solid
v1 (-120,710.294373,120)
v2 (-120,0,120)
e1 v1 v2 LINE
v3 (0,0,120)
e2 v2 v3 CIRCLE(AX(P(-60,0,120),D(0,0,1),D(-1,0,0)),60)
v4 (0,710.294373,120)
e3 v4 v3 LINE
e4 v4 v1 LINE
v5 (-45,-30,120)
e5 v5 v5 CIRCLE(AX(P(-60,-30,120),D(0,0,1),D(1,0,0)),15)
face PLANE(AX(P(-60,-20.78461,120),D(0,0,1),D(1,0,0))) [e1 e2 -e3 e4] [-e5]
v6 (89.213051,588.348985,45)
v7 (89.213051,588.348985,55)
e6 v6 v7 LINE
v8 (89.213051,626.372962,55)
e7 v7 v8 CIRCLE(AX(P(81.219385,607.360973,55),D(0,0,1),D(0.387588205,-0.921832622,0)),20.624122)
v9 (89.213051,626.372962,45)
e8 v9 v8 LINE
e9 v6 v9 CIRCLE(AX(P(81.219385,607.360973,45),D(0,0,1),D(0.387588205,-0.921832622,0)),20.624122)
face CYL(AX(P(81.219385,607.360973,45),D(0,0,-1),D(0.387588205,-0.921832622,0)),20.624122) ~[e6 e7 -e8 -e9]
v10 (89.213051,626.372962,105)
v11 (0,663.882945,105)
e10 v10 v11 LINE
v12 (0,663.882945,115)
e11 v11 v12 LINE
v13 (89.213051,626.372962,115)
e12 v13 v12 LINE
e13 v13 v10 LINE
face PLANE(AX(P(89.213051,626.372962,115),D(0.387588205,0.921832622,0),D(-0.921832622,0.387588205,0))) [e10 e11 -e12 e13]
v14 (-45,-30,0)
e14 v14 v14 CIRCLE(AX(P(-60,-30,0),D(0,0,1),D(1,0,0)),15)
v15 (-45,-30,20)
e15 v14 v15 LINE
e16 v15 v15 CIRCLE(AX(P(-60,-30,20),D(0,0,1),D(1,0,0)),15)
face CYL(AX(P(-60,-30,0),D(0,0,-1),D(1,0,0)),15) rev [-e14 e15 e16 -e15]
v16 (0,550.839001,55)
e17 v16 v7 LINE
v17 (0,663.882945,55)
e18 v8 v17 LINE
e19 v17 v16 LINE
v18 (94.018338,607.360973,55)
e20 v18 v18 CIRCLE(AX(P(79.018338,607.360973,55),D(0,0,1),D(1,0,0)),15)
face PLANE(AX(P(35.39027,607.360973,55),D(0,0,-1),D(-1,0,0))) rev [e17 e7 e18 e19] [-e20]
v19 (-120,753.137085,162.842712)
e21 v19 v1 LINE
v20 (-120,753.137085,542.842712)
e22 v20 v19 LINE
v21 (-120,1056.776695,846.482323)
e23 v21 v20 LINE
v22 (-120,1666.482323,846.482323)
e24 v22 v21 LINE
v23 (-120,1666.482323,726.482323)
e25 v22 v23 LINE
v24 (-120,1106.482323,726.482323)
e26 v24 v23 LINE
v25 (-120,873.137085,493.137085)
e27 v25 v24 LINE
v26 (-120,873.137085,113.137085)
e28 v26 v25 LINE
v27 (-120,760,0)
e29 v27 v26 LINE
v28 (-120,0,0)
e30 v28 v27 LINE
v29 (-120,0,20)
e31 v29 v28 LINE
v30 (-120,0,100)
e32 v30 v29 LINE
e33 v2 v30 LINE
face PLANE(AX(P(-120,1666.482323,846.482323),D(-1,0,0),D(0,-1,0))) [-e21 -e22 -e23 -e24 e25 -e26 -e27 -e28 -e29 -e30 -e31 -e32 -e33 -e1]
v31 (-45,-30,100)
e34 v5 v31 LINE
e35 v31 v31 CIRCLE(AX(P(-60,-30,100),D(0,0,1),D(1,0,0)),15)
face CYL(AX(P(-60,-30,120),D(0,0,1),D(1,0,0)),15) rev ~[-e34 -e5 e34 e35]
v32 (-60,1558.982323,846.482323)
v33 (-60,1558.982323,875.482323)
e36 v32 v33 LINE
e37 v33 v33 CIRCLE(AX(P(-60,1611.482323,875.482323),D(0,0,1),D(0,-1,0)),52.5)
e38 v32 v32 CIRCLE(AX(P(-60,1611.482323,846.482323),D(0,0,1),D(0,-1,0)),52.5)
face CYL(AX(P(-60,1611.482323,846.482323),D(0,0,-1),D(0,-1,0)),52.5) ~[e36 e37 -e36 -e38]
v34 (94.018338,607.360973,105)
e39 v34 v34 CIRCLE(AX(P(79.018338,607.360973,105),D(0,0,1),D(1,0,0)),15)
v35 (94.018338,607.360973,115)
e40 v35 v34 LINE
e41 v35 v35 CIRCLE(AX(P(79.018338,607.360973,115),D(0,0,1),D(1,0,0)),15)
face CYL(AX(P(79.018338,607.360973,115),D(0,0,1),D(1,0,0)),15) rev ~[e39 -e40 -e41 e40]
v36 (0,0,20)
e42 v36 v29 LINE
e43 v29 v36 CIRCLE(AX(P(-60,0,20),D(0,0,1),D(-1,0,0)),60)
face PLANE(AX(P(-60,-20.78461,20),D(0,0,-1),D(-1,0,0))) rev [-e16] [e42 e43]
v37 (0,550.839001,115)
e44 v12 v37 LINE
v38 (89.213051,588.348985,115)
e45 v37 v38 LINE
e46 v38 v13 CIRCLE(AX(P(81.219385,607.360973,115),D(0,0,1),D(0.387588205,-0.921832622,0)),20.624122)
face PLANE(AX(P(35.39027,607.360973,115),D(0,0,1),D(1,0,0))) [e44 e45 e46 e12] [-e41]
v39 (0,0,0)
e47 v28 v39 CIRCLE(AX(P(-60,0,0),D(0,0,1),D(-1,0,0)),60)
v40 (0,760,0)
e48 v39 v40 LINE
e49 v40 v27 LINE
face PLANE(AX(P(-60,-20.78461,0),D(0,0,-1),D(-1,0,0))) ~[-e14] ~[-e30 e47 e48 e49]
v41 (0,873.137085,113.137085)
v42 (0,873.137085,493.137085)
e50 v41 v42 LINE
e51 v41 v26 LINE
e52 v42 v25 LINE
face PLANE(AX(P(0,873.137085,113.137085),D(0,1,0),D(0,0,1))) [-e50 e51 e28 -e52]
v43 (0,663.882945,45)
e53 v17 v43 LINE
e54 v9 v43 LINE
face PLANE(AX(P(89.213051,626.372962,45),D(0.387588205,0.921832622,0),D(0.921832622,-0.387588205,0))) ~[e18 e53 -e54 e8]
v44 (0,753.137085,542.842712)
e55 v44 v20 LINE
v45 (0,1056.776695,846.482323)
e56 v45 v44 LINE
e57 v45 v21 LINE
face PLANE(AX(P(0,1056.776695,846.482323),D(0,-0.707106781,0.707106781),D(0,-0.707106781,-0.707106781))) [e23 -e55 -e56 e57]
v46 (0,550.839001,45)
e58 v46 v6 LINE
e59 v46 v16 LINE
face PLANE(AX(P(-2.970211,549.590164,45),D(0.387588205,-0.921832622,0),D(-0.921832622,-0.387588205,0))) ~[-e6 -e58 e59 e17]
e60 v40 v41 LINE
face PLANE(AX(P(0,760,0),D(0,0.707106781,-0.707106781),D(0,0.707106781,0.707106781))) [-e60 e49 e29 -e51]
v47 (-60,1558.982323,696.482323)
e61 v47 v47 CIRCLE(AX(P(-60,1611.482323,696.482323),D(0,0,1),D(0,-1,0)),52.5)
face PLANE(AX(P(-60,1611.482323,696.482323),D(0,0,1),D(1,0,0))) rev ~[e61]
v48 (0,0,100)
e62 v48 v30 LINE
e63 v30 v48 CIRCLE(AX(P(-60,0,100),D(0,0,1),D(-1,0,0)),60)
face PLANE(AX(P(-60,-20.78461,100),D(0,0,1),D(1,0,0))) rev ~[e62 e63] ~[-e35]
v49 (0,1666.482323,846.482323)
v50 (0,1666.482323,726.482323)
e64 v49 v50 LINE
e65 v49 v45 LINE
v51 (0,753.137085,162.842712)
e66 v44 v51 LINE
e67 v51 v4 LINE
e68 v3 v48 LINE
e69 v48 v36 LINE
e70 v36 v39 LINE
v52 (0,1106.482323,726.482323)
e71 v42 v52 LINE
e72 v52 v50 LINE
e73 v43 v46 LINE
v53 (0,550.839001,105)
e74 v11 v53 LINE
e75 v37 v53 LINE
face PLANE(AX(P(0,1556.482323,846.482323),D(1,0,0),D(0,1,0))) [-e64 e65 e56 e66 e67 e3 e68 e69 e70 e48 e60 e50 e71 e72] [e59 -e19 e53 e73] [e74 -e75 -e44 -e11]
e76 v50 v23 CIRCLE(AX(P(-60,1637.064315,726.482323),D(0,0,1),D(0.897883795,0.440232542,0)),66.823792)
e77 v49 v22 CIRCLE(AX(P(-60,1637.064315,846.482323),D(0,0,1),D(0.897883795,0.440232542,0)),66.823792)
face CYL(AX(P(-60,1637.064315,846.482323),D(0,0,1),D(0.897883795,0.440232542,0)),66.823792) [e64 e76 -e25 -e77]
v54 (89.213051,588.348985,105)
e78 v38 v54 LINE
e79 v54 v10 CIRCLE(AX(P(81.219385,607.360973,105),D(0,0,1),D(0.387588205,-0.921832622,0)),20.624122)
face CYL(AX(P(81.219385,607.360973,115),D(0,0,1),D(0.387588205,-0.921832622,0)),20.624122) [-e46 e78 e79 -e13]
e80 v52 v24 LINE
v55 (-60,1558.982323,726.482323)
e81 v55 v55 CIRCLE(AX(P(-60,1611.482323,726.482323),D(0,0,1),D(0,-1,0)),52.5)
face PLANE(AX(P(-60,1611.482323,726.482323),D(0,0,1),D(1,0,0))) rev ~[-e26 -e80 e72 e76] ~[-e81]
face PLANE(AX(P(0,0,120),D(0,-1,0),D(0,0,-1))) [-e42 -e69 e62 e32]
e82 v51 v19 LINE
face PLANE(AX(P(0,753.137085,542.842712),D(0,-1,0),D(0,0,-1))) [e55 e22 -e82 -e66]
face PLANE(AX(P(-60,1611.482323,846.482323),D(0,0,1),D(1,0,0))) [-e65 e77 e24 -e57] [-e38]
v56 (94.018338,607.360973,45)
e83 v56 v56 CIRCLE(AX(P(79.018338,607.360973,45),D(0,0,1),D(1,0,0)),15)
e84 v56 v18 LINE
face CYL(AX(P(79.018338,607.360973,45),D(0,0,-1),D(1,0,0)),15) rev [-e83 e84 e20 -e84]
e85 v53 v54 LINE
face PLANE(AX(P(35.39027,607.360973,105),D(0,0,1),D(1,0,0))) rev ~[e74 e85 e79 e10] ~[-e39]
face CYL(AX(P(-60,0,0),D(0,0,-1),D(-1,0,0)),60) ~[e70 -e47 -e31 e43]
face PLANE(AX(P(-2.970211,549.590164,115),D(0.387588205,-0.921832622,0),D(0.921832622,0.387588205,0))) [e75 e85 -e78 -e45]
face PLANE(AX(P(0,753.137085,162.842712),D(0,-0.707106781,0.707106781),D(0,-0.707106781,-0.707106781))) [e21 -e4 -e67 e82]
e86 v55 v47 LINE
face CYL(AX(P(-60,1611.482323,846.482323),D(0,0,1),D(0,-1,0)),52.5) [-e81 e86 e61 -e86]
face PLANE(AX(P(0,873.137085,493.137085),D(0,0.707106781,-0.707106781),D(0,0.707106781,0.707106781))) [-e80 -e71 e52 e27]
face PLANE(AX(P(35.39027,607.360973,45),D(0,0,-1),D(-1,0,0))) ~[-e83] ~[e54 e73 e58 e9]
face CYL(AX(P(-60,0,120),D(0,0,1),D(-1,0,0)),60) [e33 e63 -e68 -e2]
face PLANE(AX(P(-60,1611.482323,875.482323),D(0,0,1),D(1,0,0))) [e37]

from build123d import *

# Parameters (mm, degrees)
F1_DEPTH  = 120
F2_R      = 15
F3_DEPTH  = 20
F6_DEPTH  = 120
F7_DEPTH  = 29
F8_DEPTH  = 150
F11_R     = 15
F12_DEPTH = 10


# Not quite as in the source:
# - a pattern or mirror of a feature is missing from the dataset's text; its kind, count and spacing are read off the source's solid


with BuildPart() as f1:
    # F0 (on Right) → F1 (new body)
    with BuildSketch(Plane.YZ):
        Polygon((0, 120), (0, 0), (700, 0), (760, 0), (873.1370849898, 113.1370849898), (873.1370849898, 493.1370849898), (1106.4823227814, 726.4823227814), (1556.4823227814, 726.4823227814), (1556.4823227814, 846.4823227814), (1056.7766952966, 846.4823227814), (753.1370849898, 542.8427124746), (753.1370849898, 162.8427124746), (710.2943725152, 120), (700, 120), align=None)
    extrude(amount=-F1_DEPTH)

    # F2 (on face) → F3 (join)
    with BuildSketch(Plane.XY.offset(120)):
        with BuildLine():
            Line((0, 0), (-120, 0))
            ThreePointArc((-120, 0), (-60, -60), (0, 0))
        make_face()
        with Locations((-60, -30)):
            Circle(F2_R, mode=Mode.SUBTRACT)
    f3 = extrude(amount=-F3_DEPTH)

    # F3_copies: F3 across plane
    add(f3.mirror(Plane(origin=(0, 0, 60), x_dir=(-1, 0, 0), z_dir=(0, 0, -1))))

    # F5 (on face) → F6 (join)
    with BuildSketch(Plane.XY.offset(846.4823227814)):
        Polygon((-120, 1556.4823227814), (-60, 1556.4823227814), (0, 1556.4823227814), (0, 1666.4823227814), (-120, 1666.4823227814), align=None)
        with BuildLine():
            ThreePointArc((-7.5, 1611.4823227814), (-22.8768939877, 1574.3592167691), (-60, 1558.9823227814))
            ThreePointArc((-60, 1558.9823227814), (-97.1231060123, 1648.6054287937), (-7.5, 1611.4823227814))
        make_face(mode=Mode.SUBTRACT)
        with BuildLine():
            ThreePointArc((-7.5, 1611.4823227814), (-97.1231060123, 1648.6054287937), (-60, 1558.9823227814))
            ThreePointArc((-60, 1558.9823227814), (-22.8768939877, 1574.3592167691), (-7.5, 1611.4823227814))
        make_face()
        with BuildLine():
            Line((-120, 1666.4823227814), (0, 1666.4823227814))
            ThreePointArc((0, 1666.4823227814), (-60, 1703.8881069987), (-120, 1666.4823227814))
        make_face()
    extrude(amount=-F6_DEPTH)

    # F5 (on face) → F7 (join)
    with BuildSketch(Plane.XY.offset(846.4823227814)):
        with BuildLine():
            ThreePointArc((-7.5, 1611.4823227814), (-97.1231060123, 1648.6054287937), (-60, 1558.9823227814))
            ThreePointArc((-60, 1558.9823227814), (-22.8768939877, 1574.3592167691), (-7.5, 1611.4823227814))
        make_face()
    extrude(amount=F7_DEPTH)

    # F5 (on face) → F8 (join)
    with BuildSketch(Plane.XY.offset(846.4823227814)):
        with BuildLine():
            ThreePointArc((-7.5, 1611.4823227814), (-97.1231060123, 1648.6054287937), (-60, 1558.9823227814))
            ThreePointArc((-60, 1558.9823227814), (-22.8768939877, 1574.3592167691), (-7.5, 1611.4823227814))
        make_face()
    extrude(amount=-F8_DEPTH)

    # F11 (on offset) → F12 (join)
    with BuildSketch(Plane.XY.offset(115)):
        with BuildLine():
            Line((89.2130512357, 626.3729619547), (-2.970210975, 665.1317824757))
            Line((-2.970210975, 665.1317824757), (-2.970210975, 549.5901644294))
            Line((-2.970210975, 549.5901644294), (89.2130512357, 588.3489849504))
            ThreePointArc((89.2130512357, 588.3489849504), (101.8435068324, 607.3609734525), (89.2130512357, 626.3729619547))
        make_face()
        with Locations((79.0183379768, 607.3609734525)):
            Circle(F11_R, mode=Mode.SUBTRACT)
    f12 = extrude(amount=-F12_DEPTH)

    # F12_copies: F12 across plane
    add(f12.mirror(Plane(origin=(0, 0, 80), x_dir=(-1, 0, 0), z_dir=(0, 0, -1))))


solid = f1.part
